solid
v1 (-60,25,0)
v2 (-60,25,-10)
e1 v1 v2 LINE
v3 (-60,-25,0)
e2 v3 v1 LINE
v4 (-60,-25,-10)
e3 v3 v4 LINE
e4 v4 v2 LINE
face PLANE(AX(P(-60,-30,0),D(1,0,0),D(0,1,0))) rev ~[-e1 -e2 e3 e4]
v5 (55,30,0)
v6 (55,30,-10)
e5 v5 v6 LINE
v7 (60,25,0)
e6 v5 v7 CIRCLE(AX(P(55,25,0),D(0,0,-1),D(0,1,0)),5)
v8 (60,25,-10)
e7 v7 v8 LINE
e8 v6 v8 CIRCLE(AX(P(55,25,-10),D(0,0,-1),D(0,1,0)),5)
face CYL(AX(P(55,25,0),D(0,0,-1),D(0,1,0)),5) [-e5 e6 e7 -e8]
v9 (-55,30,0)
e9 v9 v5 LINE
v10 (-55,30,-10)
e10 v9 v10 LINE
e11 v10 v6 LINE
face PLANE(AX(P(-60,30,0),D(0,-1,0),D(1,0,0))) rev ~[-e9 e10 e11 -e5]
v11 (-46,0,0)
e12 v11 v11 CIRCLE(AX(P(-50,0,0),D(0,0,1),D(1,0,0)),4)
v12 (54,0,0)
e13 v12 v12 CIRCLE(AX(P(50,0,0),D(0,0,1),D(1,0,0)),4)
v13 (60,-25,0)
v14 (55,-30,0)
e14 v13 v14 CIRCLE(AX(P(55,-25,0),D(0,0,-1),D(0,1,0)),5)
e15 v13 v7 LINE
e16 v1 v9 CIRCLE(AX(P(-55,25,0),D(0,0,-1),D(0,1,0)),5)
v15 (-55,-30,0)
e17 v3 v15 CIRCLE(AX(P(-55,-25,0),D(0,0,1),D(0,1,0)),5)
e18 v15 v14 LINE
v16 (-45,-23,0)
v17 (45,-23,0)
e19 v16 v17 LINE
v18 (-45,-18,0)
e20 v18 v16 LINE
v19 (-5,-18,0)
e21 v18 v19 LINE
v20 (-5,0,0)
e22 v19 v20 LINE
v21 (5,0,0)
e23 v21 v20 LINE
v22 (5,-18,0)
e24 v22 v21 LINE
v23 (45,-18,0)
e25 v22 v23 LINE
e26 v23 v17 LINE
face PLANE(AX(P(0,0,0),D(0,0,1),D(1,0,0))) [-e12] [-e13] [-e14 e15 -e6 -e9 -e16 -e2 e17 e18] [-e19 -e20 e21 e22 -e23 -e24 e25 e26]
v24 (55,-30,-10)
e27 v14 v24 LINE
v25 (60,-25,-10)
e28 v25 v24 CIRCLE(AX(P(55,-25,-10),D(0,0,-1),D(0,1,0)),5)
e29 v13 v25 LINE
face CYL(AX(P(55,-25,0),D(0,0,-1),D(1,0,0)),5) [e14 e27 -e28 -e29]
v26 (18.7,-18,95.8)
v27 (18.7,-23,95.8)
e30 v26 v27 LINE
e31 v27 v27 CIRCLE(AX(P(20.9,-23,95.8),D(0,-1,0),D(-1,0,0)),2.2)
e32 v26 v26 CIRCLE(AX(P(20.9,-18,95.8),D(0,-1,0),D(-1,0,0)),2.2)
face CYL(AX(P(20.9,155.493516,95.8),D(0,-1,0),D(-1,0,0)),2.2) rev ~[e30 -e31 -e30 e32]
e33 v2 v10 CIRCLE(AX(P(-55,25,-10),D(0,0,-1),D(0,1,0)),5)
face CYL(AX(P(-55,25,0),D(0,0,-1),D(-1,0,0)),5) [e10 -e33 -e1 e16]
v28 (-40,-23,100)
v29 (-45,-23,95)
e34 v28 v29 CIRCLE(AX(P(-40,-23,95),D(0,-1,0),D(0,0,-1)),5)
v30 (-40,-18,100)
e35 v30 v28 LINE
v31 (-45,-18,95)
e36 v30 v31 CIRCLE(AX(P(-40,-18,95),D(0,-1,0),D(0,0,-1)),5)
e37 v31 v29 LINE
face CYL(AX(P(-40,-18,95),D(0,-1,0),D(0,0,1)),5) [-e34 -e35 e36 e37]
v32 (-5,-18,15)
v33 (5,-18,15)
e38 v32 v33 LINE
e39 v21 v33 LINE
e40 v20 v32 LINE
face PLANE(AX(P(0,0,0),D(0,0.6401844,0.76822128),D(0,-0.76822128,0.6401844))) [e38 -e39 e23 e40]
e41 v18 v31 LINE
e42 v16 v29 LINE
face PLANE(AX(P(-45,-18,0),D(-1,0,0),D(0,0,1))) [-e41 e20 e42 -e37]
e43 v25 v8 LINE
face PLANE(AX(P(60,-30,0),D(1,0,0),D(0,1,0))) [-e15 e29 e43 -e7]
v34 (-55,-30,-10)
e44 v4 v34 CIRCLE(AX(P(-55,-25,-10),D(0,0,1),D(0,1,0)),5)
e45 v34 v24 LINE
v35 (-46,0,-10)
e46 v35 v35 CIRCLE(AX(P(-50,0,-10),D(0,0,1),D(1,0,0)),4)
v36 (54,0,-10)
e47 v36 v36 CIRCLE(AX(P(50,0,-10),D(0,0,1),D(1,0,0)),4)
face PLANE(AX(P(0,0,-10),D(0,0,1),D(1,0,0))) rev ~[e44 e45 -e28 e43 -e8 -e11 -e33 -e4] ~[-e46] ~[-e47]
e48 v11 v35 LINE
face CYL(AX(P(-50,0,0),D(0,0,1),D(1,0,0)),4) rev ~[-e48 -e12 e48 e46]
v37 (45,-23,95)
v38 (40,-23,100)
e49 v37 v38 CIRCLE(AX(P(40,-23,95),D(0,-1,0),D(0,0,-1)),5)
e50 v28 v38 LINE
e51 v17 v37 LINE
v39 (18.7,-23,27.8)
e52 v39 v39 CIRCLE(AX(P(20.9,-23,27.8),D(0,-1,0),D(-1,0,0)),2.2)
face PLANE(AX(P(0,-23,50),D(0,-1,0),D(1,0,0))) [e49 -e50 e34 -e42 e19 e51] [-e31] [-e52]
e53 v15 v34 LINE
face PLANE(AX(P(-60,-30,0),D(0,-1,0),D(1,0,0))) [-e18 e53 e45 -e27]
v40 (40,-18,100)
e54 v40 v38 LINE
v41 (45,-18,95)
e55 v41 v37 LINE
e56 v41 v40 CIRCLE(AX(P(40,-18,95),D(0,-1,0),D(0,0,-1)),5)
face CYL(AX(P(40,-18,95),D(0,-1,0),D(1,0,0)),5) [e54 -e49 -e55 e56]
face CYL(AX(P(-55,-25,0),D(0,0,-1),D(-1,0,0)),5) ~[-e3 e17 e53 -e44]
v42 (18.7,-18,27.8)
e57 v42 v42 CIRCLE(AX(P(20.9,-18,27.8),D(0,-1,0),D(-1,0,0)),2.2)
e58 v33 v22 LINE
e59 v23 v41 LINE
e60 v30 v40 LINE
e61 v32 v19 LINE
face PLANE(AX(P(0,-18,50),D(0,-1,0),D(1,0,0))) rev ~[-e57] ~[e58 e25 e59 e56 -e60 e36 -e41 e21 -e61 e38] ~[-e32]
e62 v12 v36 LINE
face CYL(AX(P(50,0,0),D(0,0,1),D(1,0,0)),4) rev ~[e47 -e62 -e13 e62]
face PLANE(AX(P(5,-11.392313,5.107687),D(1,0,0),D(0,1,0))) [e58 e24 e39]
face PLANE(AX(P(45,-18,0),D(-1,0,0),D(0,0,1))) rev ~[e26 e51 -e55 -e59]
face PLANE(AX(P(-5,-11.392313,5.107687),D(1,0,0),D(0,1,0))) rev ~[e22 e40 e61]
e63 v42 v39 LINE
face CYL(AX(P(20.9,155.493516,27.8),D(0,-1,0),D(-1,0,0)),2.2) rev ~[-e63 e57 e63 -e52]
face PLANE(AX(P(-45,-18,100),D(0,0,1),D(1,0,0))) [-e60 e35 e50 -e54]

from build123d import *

# Parameters (mm, degrees)
F0_W      = 120
F0_H      = 60
F0_R      = 4
F1_DEPTH  = 10
F3_W      = 90
F3_H      = 100
F4_DEPTH  = 5
F7_D      = 4.4
F8_D      = 4.4
F9_R      = 5
F10_R     = 5
F11_R     = 5
F12_R     = 5
F13_R     = 5
F14_R     = 5
F16_DEPTH = 5


# Not quite as in the source:
# - a feature of the source that left no trace in its solid (it failed there, or was rolled back) is left out


with BuildPart() as f1:
    # F0 (on Top) → F1 (new body)
    with BuildSketch(Plane.XY):
        Rectangle(F0_W, F0_H)
        with Locations((-50, 0)):
            Circle(F0_R, mode=Mode.SUBTRACT)
        with Locations((50, 0)):
            Circle(F0_R, mode=Mode.SUBTRACT)
    extrude(amount=-F1_DEPTH)

    # F3 (on offset) → F4 (join)
    with BuildSketch(Plane.XZ.offset(18)):
        with Locations((0, 50)):
            Rectangle(F3_W, F3_H)
    extrude(amount=F4_DEPTH)

    # F7 (through all)
    with Locations(Plane(origin=(0, -18, 0), x_dir=(1, 0, 0), z_dir=(0, 1, 0))):
        with Locations((20.9, -95.8)):
            Hole(F7_D / 2)

    # F8 (through all)
    with Locations(Plane(origin=(0, -18, 0), x_dir=(1, 0, 0), z_dir=(0, 1, 0))):
        with Locations((20.9, -27.8)):
            Hole(F8_D / 2)

    # F9
    f9_edges = [f1.edges().sort_by_distance(p)[0] for p in [
        (-60, -30, -5),
    ]]
    fillet(f9_edges, radius=F9_R)

    # F10
    f10_edges = [f1.edges().sort_by_distance(p)[0] for p in [
        (-60, 30, -5),
    ]]
    fillet(f10_edges, radius=F10_R)

    # F11
    f11_edges = [f1.edges().sort_by_distance(p)[0] for p in [
        (60, 30, -5),
    ]]
    fillet(f11_edges, radius=F11_R)

    # F12
    f12_edges = [f1.edges().sort_by_distance(p)[0] for p in [
        (60, -30, -5),
    ]]
    fillet(f12_edges, radius=F12_R)

    # F13
    f13_edges = [f1.edges().sort_by_distance(p)[0] for p in [
        (45, -20.5, 100),
    ]]
    fillet(f13_edges, radius=F13_R)

    # F14
    f14_edges = [f1.edges().sort_by_distance(p)[0] for p in [
        (-45, -20.5, 100),
    ]]
    fillet(f14_edges, radius=F14_R)

    # F15 (on Right) → F16 (join, symmetric)
    with BuildSketch(Plane.YZ):
        Polygon((0, 0), (-18, 15), (-18, 0), align=None)
    extrude(amount=F16_DEPTH, both=True)


solid = f1.part
